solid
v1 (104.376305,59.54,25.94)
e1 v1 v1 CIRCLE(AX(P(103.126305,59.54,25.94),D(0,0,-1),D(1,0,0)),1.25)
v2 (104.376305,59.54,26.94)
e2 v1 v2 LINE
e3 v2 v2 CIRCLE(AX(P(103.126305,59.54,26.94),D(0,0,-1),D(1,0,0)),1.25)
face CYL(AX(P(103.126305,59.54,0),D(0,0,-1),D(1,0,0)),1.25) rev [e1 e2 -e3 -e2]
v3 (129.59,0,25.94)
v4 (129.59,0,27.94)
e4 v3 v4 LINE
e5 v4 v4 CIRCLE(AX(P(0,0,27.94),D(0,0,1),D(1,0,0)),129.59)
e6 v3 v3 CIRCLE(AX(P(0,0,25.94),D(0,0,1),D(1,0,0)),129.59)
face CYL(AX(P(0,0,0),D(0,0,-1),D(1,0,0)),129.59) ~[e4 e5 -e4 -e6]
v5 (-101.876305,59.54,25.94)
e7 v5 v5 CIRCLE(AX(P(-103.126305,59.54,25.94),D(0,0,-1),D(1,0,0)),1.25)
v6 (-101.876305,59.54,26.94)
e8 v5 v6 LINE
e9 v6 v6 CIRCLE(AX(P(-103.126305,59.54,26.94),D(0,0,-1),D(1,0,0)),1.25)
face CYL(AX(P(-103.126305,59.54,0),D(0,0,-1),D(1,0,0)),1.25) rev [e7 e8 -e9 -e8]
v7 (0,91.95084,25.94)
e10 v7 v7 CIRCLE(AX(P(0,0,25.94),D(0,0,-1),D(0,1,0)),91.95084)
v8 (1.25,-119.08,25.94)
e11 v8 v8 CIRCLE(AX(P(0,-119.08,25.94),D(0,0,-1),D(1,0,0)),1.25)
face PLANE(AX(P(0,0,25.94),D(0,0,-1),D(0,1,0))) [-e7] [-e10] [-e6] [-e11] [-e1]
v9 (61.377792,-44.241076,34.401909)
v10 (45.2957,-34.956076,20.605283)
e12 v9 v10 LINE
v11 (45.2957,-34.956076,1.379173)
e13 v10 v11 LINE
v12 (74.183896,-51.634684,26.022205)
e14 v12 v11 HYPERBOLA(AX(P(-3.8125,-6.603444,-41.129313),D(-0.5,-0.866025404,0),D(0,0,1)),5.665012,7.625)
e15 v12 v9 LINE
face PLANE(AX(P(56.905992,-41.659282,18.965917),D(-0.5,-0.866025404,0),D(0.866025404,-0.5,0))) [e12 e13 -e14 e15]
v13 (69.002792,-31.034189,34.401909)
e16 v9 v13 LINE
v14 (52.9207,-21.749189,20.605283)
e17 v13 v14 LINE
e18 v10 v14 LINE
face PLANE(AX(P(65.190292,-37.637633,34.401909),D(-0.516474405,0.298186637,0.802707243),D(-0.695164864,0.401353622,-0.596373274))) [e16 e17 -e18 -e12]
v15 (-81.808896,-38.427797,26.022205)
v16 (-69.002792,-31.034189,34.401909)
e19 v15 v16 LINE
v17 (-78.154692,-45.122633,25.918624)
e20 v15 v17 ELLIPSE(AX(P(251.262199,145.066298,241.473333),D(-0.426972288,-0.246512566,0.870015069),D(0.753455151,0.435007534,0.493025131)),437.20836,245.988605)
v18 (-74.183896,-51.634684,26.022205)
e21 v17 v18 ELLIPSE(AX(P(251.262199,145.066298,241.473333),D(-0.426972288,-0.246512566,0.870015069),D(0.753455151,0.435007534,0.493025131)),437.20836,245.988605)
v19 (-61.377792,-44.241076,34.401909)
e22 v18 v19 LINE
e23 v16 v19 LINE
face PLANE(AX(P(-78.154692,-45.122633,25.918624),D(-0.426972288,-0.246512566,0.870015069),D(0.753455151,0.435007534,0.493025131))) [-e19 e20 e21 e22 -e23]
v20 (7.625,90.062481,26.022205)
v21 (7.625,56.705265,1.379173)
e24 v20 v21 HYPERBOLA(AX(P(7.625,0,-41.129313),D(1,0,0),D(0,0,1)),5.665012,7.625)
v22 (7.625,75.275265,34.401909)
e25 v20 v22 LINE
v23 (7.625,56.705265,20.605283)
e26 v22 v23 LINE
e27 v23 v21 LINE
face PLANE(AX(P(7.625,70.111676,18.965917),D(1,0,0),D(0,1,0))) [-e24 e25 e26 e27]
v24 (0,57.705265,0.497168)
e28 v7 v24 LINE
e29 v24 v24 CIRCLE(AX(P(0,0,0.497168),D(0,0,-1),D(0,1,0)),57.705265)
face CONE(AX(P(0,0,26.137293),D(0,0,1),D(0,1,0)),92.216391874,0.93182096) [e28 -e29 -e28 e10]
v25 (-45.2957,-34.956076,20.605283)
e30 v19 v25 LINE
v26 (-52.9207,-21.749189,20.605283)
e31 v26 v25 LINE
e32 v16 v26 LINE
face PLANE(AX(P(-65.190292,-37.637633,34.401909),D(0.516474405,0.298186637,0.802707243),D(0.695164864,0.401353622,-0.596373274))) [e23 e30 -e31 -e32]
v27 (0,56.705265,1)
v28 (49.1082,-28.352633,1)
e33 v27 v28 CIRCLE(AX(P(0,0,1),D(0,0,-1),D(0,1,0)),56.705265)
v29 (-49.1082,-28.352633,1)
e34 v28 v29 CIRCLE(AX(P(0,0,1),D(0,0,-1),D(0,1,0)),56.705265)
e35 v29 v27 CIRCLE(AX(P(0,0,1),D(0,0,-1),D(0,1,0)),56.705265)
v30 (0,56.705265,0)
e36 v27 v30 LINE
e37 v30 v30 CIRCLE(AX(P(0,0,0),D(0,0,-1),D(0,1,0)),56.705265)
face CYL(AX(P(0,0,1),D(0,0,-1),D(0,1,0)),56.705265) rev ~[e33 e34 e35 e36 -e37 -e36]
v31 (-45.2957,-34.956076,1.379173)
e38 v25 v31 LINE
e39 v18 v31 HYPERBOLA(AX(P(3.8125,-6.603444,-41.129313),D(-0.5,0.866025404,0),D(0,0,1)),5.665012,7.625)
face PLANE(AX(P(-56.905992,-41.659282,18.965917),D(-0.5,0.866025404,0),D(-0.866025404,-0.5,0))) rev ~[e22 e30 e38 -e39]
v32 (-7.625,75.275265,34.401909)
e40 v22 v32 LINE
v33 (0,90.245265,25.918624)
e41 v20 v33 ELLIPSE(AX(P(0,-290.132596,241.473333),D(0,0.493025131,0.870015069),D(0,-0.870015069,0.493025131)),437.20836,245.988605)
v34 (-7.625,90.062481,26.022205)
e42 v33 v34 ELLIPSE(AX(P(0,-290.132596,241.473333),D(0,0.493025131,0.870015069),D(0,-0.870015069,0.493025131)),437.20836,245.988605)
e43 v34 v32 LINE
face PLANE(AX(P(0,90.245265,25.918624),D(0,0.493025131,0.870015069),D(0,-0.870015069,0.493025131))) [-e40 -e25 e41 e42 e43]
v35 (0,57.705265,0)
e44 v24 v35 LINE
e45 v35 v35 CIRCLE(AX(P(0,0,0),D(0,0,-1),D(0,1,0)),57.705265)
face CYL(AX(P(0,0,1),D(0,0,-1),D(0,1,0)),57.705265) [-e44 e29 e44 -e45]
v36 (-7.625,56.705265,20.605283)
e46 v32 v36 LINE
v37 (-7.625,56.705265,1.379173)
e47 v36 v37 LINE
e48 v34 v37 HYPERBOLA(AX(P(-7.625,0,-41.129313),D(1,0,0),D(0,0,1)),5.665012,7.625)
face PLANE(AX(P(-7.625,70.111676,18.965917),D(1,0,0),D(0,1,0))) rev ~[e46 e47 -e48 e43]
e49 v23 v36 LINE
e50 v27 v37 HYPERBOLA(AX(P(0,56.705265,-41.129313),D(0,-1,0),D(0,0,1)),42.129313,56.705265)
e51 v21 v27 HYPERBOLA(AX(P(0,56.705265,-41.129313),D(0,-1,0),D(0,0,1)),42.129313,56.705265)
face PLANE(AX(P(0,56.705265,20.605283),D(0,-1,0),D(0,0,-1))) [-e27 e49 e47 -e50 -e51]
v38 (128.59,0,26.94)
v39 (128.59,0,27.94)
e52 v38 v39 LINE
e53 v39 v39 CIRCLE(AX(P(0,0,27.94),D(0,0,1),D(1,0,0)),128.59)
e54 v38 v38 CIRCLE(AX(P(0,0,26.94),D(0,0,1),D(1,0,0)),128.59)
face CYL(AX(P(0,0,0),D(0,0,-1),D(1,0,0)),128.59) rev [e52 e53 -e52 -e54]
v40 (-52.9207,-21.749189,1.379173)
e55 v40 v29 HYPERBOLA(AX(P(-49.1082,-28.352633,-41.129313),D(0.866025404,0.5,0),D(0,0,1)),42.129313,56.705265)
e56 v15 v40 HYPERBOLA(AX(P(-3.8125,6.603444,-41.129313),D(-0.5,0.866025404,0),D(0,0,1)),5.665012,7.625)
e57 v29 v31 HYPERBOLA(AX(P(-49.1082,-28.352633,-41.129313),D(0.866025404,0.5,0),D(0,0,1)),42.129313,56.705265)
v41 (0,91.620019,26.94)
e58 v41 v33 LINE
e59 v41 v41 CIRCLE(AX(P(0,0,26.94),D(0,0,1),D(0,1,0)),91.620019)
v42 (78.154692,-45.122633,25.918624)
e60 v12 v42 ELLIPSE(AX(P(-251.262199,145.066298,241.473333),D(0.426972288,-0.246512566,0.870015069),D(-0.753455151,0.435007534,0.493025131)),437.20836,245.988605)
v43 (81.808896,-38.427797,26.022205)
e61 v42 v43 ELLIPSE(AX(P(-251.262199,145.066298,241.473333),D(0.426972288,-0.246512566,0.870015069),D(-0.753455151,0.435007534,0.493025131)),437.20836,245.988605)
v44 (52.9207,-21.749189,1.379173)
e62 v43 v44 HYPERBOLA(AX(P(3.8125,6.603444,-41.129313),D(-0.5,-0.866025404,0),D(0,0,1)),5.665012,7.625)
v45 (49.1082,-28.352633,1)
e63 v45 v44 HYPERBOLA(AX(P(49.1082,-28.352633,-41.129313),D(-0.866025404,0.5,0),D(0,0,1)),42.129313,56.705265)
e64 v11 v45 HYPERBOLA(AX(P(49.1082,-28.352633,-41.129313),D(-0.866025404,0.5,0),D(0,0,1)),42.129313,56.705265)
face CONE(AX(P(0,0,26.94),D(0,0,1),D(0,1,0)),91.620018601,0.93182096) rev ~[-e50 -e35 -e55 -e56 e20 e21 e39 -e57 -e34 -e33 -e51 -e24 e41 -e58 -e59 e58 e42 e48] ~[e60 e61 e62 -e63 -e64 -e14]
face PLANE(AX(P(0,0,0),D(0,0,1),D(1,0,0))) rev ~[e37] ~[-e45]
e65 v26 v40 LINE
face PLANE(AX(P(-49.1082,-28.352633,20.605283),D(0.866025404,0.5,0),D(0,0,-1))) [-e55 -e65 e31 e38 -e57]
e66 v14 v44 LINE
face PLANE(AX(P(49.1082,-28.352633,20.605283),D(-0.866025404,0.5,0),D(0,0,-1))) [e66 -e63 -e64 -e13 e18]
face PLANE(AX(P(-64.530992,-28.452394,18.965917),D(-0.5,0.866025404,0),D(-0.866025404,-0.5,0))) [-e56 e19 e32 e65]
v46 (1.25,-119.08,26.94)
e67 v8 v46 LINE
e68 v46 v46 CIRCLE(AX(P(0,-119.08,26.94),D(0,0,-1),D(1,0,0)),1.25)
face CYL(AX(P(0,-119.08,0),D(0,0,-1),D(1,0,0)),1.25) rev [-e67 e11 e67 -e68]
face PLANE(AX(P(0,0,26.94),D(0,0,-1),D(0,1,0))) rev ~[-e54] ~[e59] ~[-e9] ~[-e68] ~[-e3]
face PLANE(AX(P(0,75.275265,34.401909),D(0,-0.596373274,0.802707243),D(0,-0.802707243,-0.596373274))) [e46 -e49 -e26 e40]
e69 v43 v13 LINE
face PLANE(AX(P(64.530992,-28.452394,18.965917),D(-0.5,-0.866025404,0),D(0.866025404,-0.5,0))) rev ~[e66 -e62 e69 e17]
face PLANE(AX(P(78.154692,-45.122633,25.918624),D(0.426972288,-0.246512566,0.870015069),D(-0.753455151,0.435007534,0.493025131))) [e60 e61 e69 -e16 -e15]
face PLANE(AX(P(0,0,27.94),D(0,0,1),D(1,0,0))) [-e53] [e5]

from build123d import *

# Parameters (mm, degrees)
F0_R      = 128.59
F1_DEPTH  = 27.94
F4_T      = 1
F5_D      = 116.84
F5_DEPTH  = 1.001
F7_DEPTH  = 7.625
F8_COUNT  = 3
F8_ANGLE  = 240
F9_R      = 1.25
F10_DEPTH = 34.4029090411


with BuildPart() as f1:
    # F0 (on Top) → F1 (new body)
    with BuildSketch(Plane.XY):
        Circle(F0_R)
    extrude(amount=F1_DEPTH)

    # F2 (on Right) → F3 (revolve, cut)
    with BuildSketch(Plane.YZ):
        Polygon((56.7052650416, 1), (56.7052650416, 0), (128.59, 0), (128.59, 26.94), (91.6200186005, 26.94), align=None)
    revolve(axis=Axis((0, 0, 0), (0, 0, -1)), mode=Mode.SUBTRACT)

    # F4
    f4_openings = [f1.faces().sort_by_distance(p)[0] for p in [
        (0, 0, 27.94),
    ]]
    offset(amount=F4_T, openings=f4_openings, kind=Kind.INTERSECTION)

    # F5 (through all, one way)
    with BuildSketch(Plane.XY):
        with Locations((0, 0)):
            Circle(F5_D / 2)
    extrude(amount=-F5_DEPTH, mode=Mode.SUBTRACT)

    # F6 (on Right) → F7 (join, symmetric)
    with BuildSketch(Plane.YZ):
        Polygon((56.7052650416, 20.6052829476), (56.7052650416, 1), (90.2452650416, 25.9186235421), (75.2752650416, 34.4019090411), align=None)
    extrude(amount=F7_DEPTH, both=True)

    # F8: F1 ×3 about axis
    f8_axis = Axis((0, 0, 0.4971682023), (0, 0, -1))


with BuildPart() as f1_1:
    add(f1.part)
    for i in range(1, F8_COUNT):
        add(f1.part.rotate(f8_axis, i * F8_ANGLE / (F8_COUNT - 1)))

    # F9 (on Top) → F10 (cut, through all)
    with BuildSketch(Plane.XY):
        with Locations((-103.1263050827, 59.54)):
            Circle(F9_R)
        with Locations((0, -119.08)):
            Circle(F9_R)
        with Locations((103.1263050827, 59.54)):
            Circle(F9_R)
    extrude(amount=F10_DEPTH, mode=Mode.SUBTRACT)


solid = f1_1.part
